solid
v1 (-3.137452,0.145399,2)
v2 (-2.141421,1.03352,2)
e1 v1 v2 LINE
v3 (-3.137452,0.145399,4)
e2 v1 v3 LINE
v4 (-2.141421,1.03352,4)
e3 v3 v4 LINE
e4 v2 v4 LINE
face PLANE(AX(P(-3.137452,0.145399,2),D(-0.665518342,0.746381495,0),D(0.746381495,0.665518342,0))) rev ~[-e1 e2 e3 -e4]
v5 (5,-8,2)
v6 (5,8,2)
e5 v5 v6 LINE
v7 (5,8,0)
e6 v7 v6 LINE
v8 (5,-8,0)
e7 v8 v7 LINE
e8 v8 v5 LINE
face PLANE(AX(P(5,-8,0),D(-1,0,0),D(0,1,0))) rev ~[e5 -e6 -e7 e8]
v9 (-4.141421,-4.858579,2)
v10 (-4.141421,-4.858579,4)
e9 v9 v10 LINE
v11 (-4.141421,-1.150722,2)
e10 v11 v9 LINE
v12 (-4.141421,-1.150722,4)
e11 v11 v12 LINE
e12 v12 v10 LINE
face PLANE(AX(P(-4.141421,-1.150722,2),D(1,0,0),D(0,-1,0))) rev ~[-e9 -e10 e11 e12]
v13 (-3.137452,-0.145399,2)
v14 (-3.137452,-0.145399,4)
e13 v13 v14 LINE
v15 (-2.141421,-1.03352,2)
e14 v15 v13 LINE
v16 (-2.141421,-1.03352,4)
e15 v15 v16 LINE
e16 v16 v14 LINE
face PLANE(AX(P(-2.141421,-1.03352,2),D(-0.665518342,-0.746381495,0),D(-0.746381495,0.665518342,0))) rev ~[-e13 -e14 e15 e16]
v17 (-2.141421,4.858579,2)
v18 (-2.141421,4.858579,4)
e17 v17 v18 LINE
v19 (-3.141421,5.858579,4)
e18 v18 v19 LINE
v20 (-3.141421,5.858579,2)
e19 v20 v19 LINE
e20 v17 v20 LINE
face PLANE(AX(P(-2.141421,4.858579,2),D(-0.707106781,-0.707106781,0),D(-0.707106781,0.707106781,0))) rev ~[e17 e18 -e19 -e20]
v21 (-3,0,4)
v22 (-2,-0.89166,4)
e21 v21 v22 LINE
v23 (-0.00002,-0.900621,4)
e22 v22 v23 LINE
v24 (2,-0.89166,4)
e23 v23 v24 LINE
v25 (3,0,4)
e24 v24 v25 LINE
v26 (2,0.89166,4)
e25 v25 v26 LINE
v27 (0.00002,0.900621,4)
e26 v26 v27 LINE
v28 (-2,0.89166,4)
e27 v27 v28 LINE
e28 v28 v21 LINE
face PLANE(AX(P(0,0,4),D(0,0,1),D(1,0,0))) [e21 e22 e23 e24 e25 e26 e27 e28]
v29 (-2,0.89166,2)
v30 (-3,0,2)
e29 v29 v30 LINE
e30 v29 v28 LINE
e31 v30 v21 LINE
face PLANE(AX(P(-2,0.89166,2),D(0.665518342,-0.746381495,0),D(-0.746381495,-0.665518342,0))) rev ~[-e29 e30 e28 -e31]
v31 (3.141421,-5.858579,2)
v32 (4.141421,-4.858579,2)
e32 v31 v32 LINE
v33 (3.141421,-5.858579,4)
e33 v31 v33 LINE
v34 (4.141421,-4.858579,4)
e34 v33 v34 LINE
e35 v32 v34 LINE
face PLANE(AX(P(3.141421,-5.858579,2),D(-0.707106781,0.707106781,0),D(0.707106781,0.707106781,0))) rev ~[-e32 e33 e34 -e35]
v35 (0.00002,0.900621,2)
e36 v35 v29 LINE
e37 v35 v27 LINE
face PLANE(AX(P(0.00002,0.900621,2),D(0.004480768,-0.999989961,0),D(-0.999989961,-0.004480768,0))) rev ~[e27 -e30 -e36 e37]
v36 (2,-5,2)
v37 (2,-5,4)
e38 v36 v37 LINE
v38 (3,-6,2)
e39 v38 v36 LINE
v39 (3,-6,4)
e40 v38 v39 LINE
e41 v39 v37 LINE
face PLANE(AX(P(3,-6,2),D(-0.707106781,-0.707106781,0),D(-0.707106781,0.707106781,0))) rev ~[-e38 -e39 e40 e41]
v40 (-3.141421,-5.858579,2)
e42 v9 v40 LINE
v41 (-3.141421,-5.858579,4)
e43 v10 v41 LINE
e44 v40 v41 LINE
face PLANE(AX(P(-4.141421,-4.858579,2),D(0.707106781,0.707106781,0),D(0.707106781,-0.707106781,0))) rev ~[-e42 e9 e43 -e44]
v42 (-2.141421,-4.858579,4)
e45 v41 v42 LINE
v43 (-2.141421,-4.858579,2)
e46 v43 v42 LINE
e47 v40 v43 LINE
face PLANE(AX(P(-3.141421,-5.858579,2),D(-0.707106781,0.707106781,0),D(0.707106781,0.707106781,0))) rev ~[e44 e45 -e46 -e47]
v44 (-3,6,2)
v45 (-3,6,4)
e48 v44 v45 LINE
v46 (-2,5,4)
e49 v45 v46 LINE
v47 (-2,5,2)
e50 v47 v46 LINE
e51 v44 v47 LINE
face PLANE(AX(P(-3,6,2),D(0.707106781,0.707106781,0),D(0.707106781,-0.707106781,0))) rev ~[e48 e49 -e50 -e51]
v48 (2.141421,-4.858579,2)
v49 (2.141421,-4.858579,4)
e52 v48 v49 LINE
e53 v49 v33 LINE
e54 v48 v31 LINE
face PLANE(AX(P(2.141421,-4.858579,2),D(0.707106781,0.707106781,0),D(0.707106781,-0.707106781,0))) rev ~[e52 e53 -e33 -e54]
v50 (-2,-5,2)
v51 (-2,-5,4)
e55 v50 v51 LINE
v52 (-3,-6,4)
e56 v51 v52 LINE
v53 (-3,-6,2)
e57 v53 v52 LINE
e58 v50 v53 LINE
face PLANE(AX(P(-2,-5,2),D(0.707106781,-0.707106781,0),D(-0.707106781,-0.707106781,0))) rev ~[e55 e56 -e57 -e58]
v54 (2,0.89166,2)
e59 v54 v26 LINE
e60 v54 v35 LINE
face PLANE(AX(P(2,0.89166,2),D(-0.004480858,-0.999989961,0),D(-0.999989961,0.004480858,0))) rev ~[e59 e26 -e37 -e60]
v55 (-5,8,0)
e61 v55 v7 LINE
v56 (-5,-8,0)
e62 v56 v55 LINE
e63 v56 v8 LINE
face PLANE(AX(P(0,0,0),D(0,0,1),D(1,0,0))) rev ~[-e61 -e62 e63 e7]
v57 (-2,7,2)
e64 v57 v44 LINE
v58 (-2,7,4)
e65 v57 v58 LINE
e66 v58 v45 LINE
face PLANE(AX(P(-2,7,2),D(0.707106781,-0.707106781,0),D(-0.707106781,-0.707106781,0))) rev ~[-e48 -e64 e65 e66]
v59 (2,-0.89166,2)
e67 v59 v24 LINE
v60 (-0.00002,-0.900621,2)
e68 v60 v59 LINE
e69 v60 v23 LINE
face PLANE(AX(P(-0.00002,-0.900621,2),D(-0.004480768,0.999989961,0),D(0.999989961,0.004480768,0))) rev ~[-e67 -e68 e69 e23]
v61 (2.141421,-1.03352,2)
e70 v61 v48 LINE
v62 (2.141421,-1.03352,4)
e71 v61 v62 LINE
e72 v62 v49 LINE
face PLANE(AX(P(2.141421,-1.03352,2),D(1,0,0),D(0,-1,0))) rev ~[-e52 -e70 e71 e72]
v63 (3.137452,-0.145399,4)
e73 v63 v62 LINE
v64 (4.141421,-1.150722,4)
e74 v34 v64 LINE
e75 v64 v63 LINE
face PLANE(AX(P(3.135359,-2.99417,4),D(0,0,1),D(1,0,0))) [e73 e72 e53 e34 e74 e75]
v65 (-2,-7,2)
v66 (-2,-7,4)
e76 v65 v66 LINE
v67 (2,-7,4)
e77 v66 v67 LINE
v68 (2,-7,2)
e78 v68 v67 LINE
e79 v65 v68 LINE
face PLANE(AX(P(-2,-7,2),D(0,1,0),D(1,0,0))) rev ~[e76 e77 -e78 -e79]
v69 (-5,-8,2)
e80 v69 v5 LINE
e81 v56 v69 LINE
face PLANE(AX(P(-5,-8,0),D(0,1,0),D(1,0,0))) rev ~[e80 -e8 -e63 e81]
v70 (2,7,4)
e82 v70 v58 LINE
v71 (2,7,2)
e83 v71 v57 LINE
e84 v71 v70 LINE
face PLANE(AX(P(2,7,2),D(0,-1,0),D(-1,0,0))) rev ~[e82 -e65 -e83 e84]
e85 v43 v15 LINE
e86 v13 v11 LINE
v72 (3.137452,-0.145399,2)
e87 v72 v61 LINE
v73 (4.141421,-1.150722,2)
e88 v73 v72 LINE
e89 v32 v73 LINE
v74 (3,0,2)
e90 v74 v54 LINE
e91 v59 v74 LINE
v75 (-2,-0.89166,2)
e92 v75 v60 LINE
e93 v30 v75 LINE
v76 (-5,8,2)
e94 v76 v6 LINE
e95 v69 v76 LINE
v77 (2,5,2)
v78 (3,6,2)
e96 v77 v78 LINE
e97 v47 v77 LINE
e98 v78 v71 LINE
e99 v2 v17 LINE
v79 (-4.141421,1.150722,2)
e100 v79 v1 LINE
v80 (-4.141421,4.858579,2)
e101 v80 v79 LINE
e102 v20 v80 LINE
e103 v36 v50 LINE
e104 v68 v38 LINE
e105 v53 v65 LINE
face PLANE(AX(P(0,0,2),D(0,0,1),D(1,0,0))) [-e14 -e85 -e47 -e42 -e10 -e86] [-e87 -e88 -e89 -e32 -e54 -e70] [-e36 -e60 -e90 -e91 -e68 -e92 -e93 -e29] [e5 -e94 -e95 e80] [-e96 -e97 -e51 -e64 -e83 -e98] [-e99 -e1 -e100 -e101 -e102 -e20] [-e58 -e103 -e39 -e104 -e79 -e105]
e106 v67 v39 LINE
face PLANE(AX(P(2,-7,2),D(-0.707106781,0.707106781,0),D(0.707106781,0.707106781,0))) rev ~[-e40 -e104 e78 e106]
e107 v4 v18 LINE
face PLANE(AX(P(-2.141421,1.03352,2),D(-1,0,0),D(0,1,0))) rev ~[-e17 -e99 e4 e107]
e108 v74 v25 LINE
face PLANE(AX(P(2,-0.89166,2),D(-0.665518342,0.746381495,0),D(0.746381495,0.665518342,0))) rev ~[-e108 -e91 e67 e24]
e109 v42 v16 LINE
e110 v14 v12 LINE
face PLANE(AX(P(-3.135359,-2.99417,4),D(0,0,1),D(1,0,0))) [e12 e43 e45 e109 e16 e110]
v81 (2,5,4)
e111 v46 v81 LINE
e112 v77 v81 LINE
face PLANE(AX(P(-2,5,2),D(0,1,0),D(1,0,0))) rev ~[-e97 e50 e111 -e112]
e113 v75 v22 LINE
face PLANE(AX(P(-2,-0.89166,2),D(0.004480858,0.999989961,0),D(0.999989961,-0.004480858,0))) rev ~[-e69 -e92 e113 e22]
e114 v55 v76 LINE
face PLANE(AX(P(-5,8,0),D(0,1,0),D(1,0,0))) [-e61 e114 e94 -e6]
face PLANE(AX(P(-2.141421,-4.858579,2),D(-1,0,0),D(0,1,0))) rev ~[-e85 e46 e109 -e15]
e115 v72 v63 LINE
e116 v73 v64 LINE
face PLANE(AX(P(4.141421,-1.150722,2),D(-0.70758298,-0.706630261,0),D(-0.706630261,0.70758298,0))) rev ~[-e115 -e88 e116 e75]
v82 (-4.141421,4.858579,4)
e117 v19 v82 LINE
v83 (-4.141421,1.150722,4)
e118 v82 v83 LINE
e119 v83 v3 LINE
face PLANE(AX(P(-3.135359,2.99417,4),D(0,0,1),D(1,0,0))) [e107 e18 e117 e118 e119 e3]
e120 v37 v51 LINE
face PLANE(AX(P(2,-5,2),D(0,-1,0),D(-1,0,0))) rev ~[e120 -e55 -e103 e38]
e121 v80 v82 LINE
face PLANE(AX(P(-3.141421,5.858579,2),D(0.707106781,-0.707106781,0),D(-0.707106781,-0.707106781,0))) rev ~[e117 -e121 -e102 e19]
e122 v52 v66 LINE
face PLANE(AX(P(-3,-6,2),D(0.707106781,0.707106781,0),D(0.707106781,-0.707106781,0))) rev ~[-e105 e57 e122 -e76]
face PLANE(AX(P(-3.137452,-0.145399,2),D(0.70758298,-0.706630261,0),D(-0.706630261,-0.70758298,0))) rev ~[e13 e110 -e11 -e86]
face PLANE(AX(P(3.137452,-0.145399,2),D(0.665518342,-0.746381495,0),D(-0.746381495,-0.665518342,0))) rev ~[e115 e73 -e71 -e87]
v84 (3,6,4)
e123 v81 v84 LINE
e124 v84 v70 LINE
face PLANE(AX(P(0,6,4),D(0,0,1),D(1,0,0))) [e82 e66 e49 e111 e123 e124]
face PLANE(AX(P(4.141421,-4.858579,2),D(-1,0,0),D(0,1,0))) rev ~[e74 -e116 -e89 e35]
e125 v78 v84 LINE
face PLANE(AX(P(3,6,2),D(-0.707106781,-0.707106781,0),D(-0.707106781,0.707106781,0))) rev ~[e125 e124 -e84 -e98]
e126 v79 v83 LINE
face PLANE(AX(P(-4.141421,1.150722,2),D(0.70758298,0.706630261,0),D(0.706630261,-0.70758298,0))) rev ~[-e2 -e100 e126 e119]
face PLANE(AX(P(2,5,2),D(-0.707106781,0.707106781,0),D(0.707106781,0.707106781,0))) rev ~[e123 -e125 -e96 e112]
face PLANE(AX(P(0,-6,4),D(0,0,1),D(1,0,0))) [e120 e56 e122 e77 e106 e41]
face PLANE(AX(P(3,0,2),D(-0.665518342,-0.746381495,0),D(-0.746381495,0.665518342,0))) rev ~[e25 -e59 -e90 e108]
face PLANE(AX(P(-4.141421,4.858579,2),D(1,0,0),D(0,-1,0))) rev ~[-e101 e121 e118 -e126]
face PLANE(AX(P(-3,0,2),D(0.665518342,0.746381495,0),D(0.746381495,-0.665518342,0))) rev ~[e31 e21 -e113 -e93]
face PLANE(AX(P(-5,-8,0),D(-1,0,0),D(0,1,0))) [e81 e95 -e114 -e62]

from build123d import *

# Parameters (mm, degrees)
F0_W     = 10
F0_H     = 16
F1_DEPTH = 2
F3_DEPTH = 2


# Not quite as in the source:
# - ends of sketch curves that miss each other by under 0.0002 mm in the source are joined


with BuildPart() as f1:
    # F0 (on Top) → F1 (new body)
    with BuildSketch(Plane.XY):
        Rectangle(F0_W, F0_H)
    extrude(amount=F1_DEPTH)

    # F2 (on face) → F3 (join)
    with BuildSketch(Plane.XY.offset(2)):
        Polygon((0, 7), (-2, 7), (-3, 6), (-2, 5), (0, 5), (2, 5), (3, 6), (2, 7), align=None)
        Polygon((-2.1414213562, 4.8585786438), (-3.1414213562, 5.8585786438), (-4.1414213562, 4.8585786438), (-4.1414213562, 1.1507223826), (-3.1374518146, 0.1453992321), (-2.1414213562, 1.0335195075), align=None)
        Polygon((2, 0.891659756), (2.00782e-05, 0.9006214721), (-2, 0.891659756), (-3, 0), (-2, -0.891659756), (-2.00782e-05, -0.9006214721), (2, -0.891659756), (3, 0), align=None)
        Polygon((0, -5), (-2, -5), (-3, -6), (-2, -7), (0, -7), (2, -7), (3, -6), (2, -5), align=None)
        Polygon((-4.1414213562, -4.8585786438), (-3.1414213562, -5.8585786438), (-2.1414213562, -4.8585786438), (-2.1414213562, -1.0335195075), (-3.1374518146, -0.1453992321), (-4.1414213562, -1.1507223826), align=None)
        Polygon((3.1374518146, -0.1453992321), (2.1414213562, -1.0335195075), (2.1414213562, -4.8585786438), (3.1414213562, -5.8585786438), (4.1414213562, -4.8585786438), (4.1414213562, -1.1507223826), align=None)
    extrude(amount=F3_DEPTH)


solid = f1.part
